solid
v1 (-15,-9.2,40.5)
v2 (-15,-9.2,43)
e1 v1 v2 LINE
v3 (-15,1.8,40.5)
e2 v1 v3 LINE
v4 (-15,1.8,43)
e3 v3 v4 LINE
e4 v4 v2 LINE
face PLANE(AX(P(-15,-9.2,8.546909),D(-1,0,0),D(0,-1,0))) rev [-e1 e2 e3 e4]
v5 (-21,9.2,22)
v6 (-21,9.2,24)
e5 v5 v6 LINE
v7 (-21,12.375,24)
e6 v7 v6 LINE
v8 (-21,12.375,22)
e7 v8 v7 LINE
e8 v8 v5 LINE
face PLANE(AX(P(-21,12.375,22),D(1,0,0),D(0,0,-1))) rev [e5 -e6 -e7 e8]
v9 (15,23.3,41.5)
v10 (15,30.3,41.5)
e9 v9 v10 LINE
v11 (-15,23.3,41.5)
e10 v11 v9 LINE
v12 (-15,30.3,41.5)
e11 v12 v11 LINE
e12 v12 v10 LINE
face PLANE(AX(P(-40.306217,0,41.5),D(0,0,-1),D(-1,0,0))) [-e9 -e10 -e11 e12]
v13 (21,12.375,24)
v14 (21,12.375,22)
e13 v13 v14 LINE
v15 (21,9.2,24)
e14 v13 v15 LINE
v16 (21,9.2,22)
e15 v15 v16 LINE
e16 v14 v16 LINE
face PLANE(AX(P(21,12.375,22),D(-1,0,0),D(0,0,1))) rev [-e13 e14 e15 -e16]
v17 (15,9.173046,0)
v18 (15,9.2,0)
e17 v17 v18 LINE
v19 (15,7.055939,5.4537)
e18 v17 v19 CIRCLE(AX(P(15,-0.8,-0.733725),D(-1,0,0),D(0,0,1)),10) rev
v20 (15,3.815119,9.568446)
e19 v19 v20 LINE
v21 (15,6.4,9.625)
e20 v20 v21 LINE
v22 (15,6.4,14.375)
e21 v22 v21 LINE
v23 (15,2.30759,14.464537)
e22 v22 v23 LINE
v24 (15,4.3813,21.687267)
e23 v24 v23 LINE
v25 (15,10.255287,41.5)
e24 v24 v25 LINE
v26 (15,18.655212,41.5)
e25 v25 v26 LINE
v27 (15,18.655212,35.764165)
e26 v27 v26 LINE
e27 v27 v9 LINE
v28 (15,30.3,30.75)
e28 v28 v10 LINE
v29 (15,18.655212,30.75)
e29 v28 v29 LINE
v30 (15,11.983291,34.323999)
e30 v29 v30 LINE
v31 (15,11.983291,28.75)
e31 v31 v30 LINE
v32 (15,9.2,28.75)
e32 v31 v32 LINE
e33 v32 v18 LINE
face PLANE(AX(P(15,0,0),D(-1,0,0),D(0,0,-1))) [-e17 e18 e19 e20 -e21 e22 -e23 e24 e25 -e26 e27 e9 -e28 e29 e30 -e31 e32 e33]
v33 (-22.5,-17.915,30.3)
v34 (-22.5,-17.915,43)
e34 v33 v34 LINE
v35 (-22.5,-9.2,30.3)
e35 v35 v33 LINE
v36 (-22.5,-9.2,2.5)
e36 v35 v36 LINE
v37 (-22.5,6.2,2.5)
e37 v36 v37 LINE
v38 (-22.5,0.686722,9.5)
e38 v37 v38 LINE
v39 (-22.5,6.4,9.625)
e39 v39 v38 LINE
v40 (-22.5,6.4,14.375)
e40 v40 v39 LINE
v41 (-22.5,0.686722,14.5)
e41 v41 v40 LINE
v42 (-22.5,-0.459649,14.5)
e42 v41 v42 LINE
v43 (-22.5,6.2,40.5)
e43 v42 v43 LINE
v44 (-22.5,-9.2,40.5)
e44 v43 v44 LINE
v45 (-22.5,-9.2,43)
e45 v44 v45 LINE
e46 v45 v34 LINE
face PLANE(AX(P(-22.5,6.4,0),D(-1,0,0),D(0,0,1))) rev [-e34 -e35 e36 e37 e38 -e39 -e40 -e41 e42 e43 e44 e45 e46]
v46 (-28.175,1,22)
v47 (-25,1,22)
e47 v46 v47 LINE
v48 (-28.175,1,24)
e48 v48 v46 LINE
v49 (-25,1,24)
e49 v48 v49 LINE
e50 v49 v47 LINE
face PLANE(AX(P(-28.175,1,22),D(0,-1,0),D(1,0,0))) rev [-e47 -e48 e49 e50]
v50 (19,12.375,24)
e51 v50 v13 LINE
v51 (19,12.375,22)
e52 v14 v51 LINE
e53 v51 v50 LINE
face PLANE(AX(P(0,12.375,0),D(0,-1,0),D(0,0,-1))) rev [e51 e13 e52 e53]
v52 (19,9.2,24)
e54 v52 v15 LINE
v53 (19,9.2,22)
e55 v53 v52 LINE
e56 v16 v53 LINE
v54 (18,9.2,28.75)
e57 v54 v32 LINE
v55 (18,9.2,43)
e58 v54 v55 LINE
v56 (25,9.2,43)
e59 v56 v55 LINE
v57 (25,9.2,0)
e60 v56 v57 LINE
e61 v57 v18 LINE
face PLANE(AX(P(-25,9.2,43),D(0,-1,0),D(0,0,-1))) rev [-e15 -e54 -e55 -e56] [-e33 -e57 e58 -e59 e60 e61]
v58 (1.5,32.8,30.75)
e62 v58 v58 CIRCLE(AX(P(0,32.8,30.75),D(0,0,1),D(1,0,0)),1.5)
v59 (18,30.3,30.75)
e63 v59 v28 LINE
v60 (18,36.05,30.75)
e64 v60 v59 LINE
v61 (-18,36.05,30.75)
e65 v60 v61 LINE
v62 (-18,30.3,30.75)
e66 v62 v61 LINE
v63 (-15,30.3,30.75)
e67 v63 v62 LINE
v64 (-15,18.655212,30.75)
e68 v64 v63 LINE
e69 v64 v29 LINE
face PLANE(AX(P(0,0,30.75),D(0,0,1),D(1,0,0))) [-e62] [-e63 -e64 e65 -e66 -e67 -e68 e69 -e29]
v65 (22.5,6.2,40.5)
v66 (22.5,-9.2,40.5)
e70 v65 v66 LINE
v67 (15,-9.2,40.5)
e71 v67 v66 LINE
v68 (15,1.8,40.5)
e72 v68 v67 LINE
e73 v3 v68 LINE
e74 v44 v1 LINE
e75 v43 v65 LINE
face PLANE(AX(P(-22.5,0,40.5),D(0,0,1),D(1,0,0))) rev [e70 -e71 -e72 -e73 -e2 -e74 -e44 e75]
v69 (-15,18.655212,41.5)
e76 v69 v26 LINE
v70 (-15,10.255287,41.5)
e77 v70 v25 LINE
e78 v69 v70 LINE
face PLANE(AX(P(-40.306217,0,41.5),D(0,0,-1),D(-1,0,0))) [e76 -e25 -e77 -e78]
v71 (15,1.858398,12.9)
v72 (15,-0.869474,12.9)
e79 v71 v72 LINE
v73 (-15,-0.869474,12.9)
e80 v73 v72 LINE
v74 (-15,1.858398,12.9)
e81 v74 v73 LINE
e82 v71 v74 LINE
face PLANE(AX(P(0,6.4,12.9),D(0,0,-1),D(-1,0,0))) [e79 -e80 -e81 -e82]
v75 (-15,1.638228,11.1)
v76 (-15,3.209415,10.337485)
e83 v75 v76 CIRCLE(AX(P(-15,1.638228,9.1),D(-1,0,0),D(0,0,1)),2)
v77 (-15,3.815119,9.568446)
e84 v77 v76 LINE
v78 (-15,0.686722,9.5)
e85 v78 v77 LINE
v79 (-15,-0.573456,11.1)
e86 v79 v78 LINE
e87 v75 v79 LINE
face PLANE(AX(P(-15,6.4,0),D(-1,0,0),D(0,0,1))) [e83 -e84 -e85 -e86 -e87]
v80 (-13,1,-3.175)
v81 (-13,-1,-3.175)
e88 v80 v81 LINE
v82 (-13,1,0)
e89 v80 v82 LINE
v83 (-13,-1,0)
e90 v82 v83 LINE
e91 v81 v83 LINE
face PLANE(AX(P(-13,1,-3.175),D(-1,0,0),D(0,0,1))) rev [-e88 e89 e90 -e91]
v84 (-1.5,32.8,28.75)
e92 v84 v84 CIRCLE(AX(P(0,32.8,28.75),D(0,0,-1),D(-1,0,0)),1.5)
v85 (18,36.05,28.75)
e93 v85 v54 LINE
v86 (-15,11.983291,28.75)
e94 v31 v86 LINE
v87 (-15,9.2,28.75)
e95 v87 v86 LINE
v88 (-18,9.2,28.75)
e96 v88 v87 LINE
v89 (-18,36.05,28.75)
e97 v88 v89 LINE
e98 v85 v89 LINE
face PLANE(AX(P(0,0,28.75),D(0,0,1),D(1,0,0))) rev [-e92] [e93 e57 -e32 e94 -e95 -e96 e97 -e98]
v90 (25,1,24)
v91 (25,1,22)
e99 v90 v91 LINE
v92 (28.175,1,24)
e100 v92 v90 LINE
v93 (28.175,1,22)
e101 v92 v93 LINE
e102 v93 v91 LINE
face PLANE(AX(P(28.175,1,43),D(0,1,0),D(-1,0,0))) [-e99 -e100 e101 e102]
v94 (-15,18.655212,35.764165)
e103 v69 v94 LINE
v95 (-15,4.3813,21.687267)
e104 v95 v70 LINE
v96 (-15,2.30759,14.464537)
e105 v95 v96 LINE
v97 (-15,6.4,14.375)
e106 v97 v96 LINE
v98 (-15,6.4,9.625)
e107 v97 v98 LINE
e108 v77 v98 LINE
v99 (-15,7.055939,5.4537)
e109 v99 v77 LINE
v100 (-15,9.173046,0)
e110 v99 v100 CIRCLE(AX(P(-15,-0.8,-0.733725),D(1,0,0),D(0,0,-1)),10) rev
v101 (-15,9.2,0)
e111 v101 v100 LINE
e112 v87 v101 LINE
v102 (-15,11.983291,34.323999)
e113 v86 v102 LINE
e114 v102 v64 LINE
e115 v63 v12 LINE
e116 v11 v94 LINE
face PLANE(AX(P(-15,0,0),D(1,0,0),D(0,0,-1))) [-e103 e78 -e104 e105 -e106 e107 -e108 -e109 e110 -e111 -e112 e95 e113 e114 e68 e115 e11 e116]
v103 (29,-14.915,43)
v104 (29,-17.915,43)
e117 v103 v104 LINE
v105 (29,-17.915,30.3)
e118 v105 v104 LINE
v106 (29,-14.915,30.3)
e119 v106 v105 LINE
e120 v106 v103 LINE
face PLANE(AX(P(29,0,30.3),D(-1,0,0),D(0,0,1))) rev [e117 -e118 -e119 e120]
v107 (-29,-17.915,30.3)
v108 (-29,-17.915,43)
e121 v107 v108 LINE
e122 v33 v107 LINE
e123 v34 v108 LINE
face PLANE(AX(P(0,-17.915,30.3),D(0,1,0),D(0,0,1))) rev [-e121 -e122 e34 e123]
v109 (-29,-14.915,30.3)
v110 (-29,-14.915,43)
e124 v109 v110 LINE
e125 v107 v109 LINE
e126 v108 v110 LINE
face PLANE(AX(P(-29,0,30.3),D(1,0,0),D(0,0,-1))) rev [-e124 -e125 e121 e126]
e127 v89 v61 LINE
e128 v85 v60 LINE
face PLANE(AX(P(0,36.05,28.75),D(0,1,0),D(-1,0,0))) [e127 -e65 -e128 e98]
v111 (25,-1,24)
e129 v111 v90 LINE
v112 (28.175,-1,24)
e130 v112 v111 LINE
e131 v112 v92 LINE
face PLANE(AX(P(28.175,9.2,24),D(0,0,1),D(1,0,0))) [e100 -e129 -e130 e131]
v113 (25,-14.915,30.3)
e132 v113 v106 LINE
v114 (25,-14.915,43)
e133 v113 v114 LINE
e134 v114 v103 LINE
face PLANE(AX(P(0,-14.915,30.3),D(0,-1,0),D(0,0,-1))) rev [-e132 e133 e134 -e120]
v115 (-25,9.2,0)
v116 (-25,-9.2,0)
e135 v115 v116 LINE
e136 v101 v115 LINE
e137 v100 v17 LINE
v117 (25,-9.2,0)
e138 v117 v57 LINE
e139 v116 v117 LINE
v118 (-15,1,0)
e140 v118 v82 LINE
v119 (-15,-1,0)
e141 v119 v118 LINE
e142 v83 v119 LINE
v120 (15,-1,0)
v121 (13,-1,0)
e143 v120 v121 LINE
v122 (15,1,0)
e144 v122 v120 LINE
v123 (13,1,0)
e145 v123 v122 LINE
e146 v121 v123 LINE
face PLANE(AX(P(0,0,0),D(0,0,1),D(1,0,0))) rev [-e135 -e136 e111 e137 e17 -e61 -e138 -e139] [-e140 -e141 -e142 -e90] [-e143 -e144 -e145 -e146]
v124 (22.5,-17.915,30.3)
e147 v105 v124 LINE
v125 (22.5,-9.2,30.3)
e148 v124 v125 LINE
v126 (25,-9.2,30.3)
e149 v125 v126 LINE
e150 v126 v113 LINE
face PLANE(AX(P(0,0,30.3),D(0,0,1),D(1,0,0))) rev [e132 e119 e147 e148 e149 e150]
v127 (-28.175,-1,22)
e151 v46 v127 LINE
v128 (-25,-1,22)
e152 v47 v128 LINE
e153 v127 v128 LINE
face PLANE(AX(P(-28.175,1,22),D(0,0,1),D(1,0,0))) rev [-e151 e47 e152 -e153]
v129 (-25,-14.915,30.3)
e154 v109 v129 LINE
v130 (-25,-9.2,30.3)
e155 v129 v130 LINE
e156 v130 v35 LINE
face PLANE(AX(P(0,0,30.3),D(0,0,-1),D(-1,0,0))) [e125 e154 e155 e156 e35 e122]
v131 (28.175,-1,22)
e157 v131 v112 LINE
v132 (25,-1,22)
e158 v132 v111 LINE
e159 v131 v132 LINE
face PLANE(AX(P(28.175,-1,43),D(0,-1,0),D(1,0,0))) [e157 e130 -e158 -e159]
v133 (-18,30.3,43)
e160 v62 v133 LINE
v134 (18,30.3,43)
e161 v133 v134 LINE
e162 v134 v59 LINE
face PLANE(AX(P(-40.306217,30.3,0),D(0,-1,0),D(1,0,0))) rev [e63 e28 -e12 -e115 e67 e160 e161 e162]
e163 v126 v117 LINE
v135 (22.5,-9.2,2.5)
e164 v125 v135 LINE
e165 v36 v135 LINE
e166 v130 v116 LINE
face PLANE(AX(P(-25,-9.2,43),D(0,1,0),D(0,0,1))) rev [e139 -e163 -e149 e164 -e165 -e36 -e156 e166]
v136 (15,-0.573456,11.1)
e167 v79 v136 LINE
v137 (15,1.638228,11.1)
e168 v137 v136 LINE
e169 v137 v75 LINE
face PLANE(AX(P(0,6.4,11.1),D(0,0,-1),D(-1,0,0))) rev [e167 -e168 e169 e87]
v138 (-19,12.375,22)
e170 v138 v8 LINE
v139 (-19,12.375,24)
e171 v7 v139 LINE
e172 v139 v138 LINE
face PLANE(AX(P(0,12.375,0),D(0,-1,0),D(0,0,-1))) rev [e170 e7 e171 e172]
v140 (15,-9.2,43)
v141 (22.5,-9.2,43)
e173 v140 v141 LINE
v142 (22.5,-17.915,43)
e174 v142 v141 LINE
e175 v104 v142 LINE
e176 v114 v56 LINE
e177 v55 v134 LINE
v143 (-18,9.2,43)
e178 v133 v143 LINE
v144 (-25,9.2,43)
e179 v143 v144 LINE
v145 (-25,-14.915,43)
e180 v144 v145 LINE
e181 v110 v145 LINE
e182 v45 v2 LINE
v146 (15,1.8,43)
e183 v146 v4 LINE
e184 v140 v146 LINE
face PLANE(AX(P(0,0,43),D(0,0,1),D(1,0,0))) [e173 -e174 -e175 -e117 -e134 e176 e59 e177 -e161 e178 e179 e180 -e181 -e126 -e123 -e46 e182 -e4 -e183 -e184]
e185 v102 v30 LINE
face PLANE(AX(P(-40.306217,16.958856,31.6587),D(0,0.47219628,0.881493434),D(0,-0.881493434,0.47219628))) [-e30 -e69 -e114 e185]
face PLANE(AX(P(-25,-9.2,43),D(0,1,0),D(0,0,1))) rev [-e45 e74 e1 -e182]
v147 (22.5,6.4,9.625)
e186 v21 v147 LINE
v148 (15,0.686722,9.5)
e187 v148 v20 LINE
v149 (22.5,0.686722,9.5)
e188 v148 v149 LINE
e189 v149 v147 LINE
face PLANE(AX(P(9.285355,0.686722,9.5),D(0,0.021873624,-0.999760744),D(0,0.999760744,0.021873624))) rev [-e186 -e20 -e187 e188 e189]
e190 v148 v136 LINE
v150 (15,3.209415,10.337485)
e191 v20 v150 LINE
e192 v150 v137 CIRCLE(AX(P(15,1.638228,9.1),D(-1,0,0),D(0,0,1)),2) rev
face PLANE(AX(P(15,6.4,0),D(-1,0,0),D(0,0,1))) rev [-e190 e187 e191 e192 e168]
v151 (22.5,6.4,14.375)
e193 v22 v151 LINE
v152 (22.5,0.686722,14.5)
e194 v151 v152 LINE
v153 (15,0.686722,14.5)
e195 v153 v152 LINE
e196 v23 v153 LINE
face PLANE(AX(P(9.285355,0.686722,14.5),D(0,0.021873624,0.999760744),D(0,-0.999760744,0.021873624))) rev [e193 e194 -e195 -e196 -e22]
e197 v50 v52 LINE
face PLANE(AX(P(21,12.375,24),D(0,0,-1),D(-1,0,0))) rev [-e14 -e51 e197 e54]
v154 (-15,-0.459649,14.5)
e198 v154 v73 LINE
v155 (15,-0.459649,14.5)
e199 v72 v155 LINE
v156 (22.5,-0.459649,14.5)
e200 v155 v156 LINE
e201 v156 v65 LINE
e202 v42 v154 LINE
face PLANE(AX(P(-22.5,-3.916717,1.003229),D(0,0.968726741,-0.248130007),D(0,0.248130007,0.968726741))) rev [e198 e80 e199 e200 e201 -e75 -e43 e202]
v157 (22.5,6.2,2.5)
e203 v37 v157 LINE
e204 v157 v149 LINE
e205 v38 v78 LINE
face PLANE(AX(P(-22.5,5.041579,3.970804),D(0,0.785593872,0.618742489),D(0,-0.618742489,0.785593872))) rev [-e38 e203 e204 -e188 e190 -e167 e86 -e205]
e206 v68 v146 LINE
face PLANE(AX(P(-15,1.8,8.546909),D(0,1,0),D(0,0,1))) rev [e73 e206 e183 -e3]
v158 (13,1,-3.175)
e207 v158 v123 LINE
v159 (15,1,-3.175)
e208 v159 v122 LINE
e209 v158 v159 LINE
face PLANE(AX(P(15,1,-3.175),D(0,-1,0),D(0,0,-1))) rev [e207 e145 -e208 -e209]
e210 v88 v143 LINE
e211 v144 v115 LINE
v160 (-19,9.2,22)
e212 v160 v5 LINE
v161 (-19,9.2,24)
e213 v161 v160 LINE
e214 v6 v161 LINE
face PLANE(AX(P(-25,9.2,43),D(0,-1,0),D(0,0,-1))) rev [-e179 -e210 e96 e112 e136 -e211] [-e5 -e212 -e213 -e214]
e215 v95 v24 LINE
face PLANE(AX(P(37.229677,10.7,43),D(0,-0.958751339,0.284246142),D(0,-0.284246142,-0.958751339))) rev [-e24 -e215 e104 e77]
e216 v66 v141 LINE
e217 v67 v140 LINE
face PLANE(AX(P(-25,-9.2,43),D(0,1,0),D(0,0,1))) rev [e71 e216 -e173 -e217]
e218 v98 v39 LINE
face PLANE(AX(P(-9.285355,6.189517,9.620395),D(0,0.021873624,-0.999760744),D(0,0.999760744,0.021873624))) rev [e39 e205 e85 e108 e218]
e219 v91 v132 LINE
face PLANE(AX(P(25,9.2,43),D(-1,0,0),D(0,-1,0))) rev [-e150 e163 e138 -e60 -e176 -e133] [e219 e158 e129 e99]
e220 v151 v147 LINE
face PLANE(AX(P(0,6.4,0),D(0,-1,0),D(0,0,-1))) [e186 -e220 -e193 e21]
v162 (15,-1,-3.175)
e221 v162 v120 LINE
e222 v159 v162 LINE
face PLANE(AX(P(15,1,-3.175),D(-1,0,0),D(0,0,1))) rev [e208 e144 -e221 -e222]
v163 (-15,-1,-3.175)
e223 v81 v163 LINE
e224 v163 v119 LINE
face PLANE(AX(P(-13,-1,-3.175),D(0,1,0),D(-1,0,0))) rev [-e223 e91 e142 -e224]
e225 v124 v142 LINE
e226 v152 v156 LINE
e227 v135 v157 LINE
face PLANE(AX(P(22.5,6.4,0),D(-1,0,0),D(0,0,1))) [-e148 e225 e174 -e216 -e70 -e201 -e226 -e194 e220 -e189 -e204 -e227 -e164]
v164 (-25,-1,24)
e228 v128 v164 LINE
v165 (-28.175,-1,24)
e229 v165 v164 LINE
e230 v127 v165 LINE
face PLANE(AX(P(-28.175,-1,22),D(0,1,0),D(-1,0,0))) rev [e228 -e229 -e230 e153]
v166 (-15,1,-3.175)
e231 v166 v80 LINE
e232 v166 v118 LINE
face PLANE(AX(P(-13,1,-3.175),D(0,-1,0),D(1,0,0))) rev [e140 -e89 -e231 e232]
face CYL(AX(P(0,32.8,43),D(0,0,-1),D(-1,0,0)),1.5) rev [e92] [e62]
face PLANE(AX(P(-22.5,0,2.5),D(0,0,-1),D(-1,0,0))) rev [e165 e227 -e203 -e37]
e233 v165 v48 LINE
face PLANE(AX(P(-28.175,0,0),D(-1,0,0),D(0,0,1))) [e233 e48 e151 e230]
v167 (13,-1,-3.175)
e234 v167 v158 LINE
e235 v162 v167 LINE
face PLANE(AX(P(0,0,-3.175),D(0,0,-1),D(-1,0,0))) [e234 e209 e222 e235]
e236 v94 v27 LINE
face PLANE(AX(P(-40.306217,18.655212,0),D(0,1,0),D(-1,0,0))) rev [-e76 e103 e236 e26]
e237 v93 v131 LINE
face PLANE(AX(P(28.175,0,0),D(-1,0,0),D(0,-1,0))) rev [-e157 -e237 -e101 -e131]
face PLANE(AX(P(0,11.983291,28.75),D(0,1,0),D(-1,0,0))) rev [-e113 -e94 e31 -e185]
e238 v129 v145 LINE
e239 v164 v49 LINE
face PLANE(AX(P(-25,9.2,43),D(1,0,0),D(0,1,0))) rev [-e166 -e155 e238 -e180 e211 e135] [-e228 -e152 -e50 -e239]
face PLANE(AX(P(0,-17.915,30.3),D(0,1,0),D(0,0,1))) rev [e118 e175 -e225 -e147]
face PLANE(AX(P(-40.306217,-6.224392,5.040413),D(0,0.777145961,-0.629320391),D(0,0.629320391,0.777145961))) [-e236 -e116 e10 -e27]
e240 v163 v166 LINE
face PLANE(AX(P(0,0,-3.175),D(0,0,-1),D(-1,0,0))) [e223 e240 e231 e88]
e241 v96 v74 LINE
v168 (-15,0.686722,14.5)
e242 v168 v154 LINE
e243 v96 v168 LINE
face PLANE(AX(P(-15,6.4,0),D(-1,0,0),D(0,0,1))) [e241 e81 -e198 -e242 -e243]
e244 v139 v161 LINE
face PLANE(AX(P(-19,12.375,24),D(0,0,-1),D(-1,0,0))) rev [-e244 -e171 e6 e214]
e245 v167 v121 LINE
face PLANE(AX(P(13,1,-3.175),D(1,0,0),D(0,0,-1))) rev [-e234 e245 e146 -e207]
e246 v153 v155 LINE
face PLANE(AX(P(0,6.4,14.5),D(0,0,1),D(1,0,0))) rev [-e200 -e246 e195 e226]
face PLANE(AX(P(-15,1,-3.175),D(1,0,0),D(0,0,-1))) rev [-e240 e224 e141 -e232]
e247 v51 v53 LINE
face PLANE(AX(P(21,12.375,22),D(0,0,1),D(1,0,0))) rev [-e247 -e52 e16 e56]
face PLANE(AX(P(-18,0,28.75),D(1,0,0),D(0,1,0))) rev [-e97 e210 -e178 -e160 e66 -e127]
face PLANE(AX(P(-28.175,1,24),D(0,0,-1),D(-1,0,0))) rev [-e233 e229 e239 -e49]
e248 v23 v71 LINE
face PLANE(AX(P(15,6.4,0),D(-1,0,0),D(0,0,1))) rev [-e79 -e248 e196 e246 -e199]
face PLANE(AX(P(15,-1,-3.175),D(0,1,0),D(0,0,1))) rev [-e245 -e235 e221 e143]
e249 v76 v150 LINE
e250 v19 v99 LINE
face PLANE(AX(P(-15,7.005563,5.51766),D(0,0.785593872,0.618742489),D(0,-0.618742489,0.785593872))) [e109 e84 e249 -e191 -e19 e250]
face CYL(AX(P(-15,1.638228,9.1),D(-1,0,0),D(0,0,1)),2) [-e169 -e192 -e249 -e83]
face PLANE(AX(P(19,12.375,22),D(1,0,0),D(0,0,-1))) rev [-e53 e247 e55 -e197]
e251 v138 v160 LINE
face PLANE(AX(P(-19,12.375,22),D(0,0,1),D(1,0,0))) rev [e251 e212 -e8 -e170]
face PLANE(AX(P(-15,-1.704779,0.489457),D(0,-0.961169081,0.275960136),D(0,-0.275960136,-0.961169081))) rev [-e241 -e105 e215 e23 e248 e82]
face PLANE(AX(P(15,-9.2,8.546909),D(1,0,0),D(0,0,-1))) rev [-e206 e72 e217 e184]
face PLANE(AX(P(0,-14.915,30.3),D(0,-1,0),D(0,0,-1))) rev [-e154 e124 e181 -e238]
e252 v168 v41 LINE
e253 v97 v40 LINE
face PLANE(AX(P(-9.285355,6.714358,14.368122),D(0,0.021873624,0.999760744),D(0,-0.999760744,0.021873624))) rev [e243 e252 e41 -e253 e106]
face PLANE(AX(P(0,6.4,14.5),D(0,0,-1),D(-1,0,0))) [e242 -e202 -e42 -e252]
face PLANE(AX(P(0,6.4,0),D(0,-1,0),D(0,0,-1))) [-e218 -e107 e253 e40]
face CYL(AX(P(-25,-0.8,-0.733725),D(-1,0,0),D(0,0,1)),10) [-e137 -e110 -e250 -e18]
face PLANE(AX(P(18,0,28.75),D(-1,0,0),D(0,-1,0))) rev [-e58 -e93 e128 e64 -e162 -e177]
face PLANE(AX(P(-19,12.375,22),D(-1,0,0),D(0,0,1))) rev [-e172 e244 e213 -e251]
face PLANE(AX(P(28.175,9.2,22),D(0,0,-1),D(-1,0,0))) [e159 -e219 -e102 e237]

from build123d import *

# Parameters (mm, degrees)
SKETCH1_W               = 50
SKETCH1_H               = 18.4
BOSS_EXTRUDE1_DEPTH     = 43
SKETCH2_W               = 7.5
SKETCH2_H               = 5
SKETCH2_W_2             = 30
SKETCH2_H_2             = 1.8
CUT_EXTRUDE1_DEPTH      = 15.6
CUT_EXTRUDE2_START      = -22.5
CUT_EXTRUDE2_DEPTH      = 22.5
CUT_EXTRUDE3_START      = -15
CUT_EXTRUDE3_DEPTH      = 15
BOSS_EXTRUDE3_DEPTH     = 7.5
BOSS_EXTRUDE4_START     = 45
BOSS_EXTRUDE4_DEPTH     = 7.5
BOSS_EXTRUDE7_DEPTH     = 30
MTRL_RMV_DEPTH          = 60.694974663
SKETCH22_W              = 36
SKETCH22_H              = 24.066709319
SKETCH22_W_2            = 3
SKETCH22_H_2            = 2.783290681
BOSS_EXTRUDE8_DEPTH     = 2
BOSS_EXTRUDE9_DEPTH     = 36
SKETCH27_W              = 3
SKETCH27_H              = 21.1
BOSS_EXTRUDE10_DEPTH    = 14.25
SKETCH28_R              = 1.5
CUT_EXTRUDE4_DEPTH      = 53.451549072
SKETCH4_W               = 30
SKETCH4_H               = 11
WIRE_HOLE_DEPTH         = 2.5
SKETCH13_W              = 2
SKETCH13_H              = 2
FRONT_SHIELD_PEGS_DEPTH = 3.175
SKETCH14_W              = 2
SKETCH14_H              = 2
TOP_SHIELD_PEGS_DEPTH   = 3.175
FILLET9_R               = 10
FILLET10_R              = 2
LEGS_START              = 24
LEGS_DEPTH              = 12.7
SKETCH29_W              = 2
SKETCH29_H              = 2
SIDE_SHIELD_PEGS1_DEPTH = 3.175
SIDE_START              = -50
SKETCH29_2_W            = 2
SKETCH29_2_H            = 2
SIDE_SHIELD_PEGS2_DEPTH = 3.175


with BuildPart() as part:
    # Sketch1 → Boss-Extrude1 (new body)
    with BuildSketch(Plane.XY):
        Rectangle(SKETCH1_W, SKETCH1_H)
    extrude(amount=BOSS_EXTRUDE1_DEPTH)

    # Sketch2 → Cut-Extrude1 (cut)
    with BuildSketch(Plane(origin=(0, -9.2, 0), x_dir=(-1, 0, 0), z_dir=(0, -1, 0))):
        with Locations((-18.75, -12)):
            Rectangle(SKETCH2_W, SKETCH2_H)
        with Locations((18.75, -12)):
            Rectangle(SKETCH2_W, SKETCH2_H)
        with Locations((0, -12)):
            Rectangle(SKETCH2_W_2, SKETCH2_H_2)
    extrude(amount=-CUT_EXTRUDE1_DEPTH, mode=Mode.SUBTRACT)

    # Sketch3 → Cut-Extrude2 (cut)
    with BuildSketch(Plane(origin=(0, 0, 0), x_dir=(0, 0, -1), z_dir=(1, 0, 0)).offset(CUT_EXTRUDE2_START)):
        Polygon((-40.5, 6.2), (-40.5, -9.2), (-2.5, -9.2), (-2.5, 6.2), (-11.825335932, -1.144738516), align=None)
    cut_extrude2 = extrude(amount=CUT_EXTRUDE2_DEPTH, mode=Mode.SUBTRACT)

    # Mirror3: Cut-Extrude2 across plane
    add(cut_extrude2.mirror(Plane(origin=(0, 0, 0), x_dir=(0, 0, 1), z_dir=(1, 0, 0))), mode=Mode.SUBTRACT)

    # Sketch3<3> → Cut-Extrude3 (cut)
    with BuildSketch(Plane(origin=(0, 0, 0), x_dir=(0, 0, -1), z_dir=(1, 0, 0)).offset(CUT_EXTRUDE3_START)):
        Polygon((-12, 1.9), (-2.731466864, 9.2), (-40.5, 9.2), (-21.687267414, 4.381300074), (-12, 1.6), align=None)
    cut_extrude3 = extrude(amount=CUT_EXTRUDE3_DEPTH, mode=Mode.SUBTRACT)

    # Mirror4: Cut-Extrude3 across plane
    add(cut_extrude3.mirror(Plane(origin=(0, 0, 0), x_dir=(0, 0, 1), z_dir=(1, 0, 0))), mode=Mode.SUBTRACT)

    # Sketch12 → Boss-Extrude3 (add)
    with BuildSketch(Plane.ZY.offset(-22.5)):
        Polygon((9.5, 6.4), (9.5, 0.686721981), (9.625, 6.4), align=None)
        Polygon((14.5, 6.4), (14.5, 0.686721981), (14.375, 6.4), align=None)
    extrude(amount=BOSS_EXTRUDE3_DEPTH)

    # Sketch12<2> → Boss-Extrude4 (add)
    with BuildSketch(Plane.ZY.offset(-22.5).offset(BOSS_EXTRUDE4_START)):
        Polygon((9.5, 6.4), (9.5, 0.686721981), (9.625, 6.4), align=None)
        Polygon((14.5, 6.4), (14.5, 0.686721981), (14.375, 6.4), align=None)
    extrude(amount=-BOSS_EXTRUDE4_DEPTH)

    # Sketch17 → Boss-Extrude7 (add)
    with BuildSketch(Plane(origin=(-15, 0, 0), x_dir=(0, 0, -1), z_dir=(1, 0, 0))):
        Polygon((-43, 9.2), (-43, 10.7), (-21.687267414, 4.381300074), (-40.5, 9.2), align=None)
    extrude(amount=BOSS_EXTRUDE7_DEPTH)

    # Sketch18 → Mtrl Rmv (cut, through all)
    with BuildSketch(Plane(origin=(15, 0, 0), x_dir=(0, 0, -1), z_dir=(1, 0, 0))):
        Polygon((-43, 10.7), (-43, 9.2), (-37.940557511, 9.2), align=None)
    extrude(amount=-MTRL_RMV_DEPTH, mode=Mode.SUBTRACT)

    # Sketch22 → Boss-Extrude8 (add)
    with BuildSketch(Plane.XY.offset(30.75)):
        with Locations((0, 24.016645341)):
            Rectangle(SKETCH22_W, SKETCH22_H)
        with Locations((16.5, 10.591645341)):
            Rectangle(SKETCH22_W_2, SKETCH22_H_2)
        with Locations((-16.5, 10.591645341)):
            Rectangle(SKETCH22_W_2, SKETCH22_H_2)
    extrude(amount=-BOSS_EXTRUDE8_DEPTH)

    # Sketch25 → Boss-Extrude9 (add)
    with BuildSketch(Plane(origin=(18, 0, 0), x_dir=(0, 0, -1), z_dir=(1, 0, 0))):
        Polygon((-43, 30.3), (-43, 9.2), (-37.940557511, 9.2), (-41.5, 10.25528697), (-41.5, 18.655212051), (-35.764164569, 18.655212051), (-41.5, 23.3), (-41.5, 30.3), align=None)
        Polygon((-30.75, 11.983290681), (-30.75, 18.655212051), (-34.323998772, 11.983290681), align=None)
    extrude(amount=-BOSS_EXTRUDE9_DEPTH)

    # Sketch27 → Boss-Extrude10 (add)
    with BuildSketch(Plane.XY.offset(43)):
        with Locations((-16.5, 19.75)):
            Rectangle(SKETCH27_W, SKETCH27_H)
        with Locations((16.5, 19.75)):
            Rectangle(SKETCH27_W, SKETCH27_H)
    extrude(amount=-BOSS_EXTRUDE10_DEPTH)

    # Sketch28 → Cut-Extrude4 (cut, through all)
    with BuildSketch(Plane(origin=(0, 0, 28.75), x_dir=(-1, 0, 0), z_dir=(0, 0, -1))):
        with Locations((0, 32.8)):
            Circle(SKETCH28_R)
    extrude(amount=-CUT_EXTRUDE4_DEPTH, mode=Mode.SUBTRACT)

    # Sketch4 → Wire Hole (cut)
    with BuildSketch(Plane.XY.offset(43)):
        with Locations((0, -3.7)):
            Rectangle(SKETCH4_W, SKETCH4_H)
    extrude(amount=-WIRE_HOLE_DEPTH, mode=Mode.SUBTRACT)

    # Sketch13 → Front Shield Pegs (add)
    with BuildSketch(Plane(origin=(0, 0, 0), x_dir=(-1, 0, 0), z_dir=(0, 0, -1))):
        with Locations((-14, 0)):
            Rectangle(SKETCH13_W, SKETCH13_H)
        with Locations((14, 0)):
            Rectangle(SKETCH13_W, SKETCH13_H)
    extrude(amount=FRONT_SHIELD_PEGS_DEPTH)

    # Sketch14 → Top Shield Pegs (add)
    with BuildSketch(Plane(origin=(0, 9.2, 0), x_dir=(1, 0, 0), z_dir=(0, 1, 0))):
        with Locations((20, -23)):
            Rectangle(SKETCH14_W, SKETCH14_H)
        with Locations((-20, -23)):
            Rectangle(SKETCH14_W, SKETCH14_H)
    extrude(amount=TOP_SHIELD_PEGS_DEPTH)

    # Fillet9
    # the kernel refuses this fillet: 10 mm, written as the material it takes off along each edge
    with BuildSketch(Plane(origin=(-15, 9.2, 2.731466864), x_dir=(0, 0, -1), z_dir=(1, 0, 0))) as fillet9_piece_1:
        with BuildLine():
            CenterArc((FILLET9_R * 0.346519160452, -FILLET9_R), FILLET9_R, 90, 38.224362431)
            Line((-FILLET9_R * 0.27222332899, -FILLET9_R * 0.214406127977), (0, 0))
            Line((0, 0), (FILLET9_R * 0.346519160452, 0))
        make_face()
    extrude(amount=30, mode=Mode.SUBTRACT)

    # Fillet10
    fillet10_edges = [part.edges().sort_by_distance(p)[0] for p in [
        (0, 2.608850031, 11.1),
    ]]
    fillet(fillet10_edges, radius=FILLET10_R)

    # Sketch19 → Legs (add)
    with BuildSketch(Plane.XY.offset(19).offset(LEGS_START)):
        Polygon((22.5, -9.2), (22.5, -17.915), (29, -17.915), (29, -14.915), (25, -14.915), (25, -9.2), align=None)
        Polygon((-22.5, -9.2), (-22.5, -17.915), (-29, -17.915), (-29, -14.915), (-25, -14.915), (-25, -9.2), align=None)
    extrude(amount=-LEGS_DEPTH)

    # Sketch29 → Side Shield Pegs1 (add)
    with BuildSketch(Plane.ZY.offset(25)):
        with Locations((23, 0)):
            Rectangle(SKETCH29_W, SKETCH29_H)
    extrude(amount=SIDE_SHIELD_PEGS1_DEPTH)

    # Sketch29<2> → Side Shield Pegs2 (add)
    with BuildSketch(Plane.ZY.offset(25).offset(SIDE_START)):
        with Locations((23, 0)):
            Rectangle(SKETCH29_2_W, SKETCH29_2_H)
    extrude(amount=-SIDE_SHIELD_PEGS2_DEPTH)


solid = part.part
